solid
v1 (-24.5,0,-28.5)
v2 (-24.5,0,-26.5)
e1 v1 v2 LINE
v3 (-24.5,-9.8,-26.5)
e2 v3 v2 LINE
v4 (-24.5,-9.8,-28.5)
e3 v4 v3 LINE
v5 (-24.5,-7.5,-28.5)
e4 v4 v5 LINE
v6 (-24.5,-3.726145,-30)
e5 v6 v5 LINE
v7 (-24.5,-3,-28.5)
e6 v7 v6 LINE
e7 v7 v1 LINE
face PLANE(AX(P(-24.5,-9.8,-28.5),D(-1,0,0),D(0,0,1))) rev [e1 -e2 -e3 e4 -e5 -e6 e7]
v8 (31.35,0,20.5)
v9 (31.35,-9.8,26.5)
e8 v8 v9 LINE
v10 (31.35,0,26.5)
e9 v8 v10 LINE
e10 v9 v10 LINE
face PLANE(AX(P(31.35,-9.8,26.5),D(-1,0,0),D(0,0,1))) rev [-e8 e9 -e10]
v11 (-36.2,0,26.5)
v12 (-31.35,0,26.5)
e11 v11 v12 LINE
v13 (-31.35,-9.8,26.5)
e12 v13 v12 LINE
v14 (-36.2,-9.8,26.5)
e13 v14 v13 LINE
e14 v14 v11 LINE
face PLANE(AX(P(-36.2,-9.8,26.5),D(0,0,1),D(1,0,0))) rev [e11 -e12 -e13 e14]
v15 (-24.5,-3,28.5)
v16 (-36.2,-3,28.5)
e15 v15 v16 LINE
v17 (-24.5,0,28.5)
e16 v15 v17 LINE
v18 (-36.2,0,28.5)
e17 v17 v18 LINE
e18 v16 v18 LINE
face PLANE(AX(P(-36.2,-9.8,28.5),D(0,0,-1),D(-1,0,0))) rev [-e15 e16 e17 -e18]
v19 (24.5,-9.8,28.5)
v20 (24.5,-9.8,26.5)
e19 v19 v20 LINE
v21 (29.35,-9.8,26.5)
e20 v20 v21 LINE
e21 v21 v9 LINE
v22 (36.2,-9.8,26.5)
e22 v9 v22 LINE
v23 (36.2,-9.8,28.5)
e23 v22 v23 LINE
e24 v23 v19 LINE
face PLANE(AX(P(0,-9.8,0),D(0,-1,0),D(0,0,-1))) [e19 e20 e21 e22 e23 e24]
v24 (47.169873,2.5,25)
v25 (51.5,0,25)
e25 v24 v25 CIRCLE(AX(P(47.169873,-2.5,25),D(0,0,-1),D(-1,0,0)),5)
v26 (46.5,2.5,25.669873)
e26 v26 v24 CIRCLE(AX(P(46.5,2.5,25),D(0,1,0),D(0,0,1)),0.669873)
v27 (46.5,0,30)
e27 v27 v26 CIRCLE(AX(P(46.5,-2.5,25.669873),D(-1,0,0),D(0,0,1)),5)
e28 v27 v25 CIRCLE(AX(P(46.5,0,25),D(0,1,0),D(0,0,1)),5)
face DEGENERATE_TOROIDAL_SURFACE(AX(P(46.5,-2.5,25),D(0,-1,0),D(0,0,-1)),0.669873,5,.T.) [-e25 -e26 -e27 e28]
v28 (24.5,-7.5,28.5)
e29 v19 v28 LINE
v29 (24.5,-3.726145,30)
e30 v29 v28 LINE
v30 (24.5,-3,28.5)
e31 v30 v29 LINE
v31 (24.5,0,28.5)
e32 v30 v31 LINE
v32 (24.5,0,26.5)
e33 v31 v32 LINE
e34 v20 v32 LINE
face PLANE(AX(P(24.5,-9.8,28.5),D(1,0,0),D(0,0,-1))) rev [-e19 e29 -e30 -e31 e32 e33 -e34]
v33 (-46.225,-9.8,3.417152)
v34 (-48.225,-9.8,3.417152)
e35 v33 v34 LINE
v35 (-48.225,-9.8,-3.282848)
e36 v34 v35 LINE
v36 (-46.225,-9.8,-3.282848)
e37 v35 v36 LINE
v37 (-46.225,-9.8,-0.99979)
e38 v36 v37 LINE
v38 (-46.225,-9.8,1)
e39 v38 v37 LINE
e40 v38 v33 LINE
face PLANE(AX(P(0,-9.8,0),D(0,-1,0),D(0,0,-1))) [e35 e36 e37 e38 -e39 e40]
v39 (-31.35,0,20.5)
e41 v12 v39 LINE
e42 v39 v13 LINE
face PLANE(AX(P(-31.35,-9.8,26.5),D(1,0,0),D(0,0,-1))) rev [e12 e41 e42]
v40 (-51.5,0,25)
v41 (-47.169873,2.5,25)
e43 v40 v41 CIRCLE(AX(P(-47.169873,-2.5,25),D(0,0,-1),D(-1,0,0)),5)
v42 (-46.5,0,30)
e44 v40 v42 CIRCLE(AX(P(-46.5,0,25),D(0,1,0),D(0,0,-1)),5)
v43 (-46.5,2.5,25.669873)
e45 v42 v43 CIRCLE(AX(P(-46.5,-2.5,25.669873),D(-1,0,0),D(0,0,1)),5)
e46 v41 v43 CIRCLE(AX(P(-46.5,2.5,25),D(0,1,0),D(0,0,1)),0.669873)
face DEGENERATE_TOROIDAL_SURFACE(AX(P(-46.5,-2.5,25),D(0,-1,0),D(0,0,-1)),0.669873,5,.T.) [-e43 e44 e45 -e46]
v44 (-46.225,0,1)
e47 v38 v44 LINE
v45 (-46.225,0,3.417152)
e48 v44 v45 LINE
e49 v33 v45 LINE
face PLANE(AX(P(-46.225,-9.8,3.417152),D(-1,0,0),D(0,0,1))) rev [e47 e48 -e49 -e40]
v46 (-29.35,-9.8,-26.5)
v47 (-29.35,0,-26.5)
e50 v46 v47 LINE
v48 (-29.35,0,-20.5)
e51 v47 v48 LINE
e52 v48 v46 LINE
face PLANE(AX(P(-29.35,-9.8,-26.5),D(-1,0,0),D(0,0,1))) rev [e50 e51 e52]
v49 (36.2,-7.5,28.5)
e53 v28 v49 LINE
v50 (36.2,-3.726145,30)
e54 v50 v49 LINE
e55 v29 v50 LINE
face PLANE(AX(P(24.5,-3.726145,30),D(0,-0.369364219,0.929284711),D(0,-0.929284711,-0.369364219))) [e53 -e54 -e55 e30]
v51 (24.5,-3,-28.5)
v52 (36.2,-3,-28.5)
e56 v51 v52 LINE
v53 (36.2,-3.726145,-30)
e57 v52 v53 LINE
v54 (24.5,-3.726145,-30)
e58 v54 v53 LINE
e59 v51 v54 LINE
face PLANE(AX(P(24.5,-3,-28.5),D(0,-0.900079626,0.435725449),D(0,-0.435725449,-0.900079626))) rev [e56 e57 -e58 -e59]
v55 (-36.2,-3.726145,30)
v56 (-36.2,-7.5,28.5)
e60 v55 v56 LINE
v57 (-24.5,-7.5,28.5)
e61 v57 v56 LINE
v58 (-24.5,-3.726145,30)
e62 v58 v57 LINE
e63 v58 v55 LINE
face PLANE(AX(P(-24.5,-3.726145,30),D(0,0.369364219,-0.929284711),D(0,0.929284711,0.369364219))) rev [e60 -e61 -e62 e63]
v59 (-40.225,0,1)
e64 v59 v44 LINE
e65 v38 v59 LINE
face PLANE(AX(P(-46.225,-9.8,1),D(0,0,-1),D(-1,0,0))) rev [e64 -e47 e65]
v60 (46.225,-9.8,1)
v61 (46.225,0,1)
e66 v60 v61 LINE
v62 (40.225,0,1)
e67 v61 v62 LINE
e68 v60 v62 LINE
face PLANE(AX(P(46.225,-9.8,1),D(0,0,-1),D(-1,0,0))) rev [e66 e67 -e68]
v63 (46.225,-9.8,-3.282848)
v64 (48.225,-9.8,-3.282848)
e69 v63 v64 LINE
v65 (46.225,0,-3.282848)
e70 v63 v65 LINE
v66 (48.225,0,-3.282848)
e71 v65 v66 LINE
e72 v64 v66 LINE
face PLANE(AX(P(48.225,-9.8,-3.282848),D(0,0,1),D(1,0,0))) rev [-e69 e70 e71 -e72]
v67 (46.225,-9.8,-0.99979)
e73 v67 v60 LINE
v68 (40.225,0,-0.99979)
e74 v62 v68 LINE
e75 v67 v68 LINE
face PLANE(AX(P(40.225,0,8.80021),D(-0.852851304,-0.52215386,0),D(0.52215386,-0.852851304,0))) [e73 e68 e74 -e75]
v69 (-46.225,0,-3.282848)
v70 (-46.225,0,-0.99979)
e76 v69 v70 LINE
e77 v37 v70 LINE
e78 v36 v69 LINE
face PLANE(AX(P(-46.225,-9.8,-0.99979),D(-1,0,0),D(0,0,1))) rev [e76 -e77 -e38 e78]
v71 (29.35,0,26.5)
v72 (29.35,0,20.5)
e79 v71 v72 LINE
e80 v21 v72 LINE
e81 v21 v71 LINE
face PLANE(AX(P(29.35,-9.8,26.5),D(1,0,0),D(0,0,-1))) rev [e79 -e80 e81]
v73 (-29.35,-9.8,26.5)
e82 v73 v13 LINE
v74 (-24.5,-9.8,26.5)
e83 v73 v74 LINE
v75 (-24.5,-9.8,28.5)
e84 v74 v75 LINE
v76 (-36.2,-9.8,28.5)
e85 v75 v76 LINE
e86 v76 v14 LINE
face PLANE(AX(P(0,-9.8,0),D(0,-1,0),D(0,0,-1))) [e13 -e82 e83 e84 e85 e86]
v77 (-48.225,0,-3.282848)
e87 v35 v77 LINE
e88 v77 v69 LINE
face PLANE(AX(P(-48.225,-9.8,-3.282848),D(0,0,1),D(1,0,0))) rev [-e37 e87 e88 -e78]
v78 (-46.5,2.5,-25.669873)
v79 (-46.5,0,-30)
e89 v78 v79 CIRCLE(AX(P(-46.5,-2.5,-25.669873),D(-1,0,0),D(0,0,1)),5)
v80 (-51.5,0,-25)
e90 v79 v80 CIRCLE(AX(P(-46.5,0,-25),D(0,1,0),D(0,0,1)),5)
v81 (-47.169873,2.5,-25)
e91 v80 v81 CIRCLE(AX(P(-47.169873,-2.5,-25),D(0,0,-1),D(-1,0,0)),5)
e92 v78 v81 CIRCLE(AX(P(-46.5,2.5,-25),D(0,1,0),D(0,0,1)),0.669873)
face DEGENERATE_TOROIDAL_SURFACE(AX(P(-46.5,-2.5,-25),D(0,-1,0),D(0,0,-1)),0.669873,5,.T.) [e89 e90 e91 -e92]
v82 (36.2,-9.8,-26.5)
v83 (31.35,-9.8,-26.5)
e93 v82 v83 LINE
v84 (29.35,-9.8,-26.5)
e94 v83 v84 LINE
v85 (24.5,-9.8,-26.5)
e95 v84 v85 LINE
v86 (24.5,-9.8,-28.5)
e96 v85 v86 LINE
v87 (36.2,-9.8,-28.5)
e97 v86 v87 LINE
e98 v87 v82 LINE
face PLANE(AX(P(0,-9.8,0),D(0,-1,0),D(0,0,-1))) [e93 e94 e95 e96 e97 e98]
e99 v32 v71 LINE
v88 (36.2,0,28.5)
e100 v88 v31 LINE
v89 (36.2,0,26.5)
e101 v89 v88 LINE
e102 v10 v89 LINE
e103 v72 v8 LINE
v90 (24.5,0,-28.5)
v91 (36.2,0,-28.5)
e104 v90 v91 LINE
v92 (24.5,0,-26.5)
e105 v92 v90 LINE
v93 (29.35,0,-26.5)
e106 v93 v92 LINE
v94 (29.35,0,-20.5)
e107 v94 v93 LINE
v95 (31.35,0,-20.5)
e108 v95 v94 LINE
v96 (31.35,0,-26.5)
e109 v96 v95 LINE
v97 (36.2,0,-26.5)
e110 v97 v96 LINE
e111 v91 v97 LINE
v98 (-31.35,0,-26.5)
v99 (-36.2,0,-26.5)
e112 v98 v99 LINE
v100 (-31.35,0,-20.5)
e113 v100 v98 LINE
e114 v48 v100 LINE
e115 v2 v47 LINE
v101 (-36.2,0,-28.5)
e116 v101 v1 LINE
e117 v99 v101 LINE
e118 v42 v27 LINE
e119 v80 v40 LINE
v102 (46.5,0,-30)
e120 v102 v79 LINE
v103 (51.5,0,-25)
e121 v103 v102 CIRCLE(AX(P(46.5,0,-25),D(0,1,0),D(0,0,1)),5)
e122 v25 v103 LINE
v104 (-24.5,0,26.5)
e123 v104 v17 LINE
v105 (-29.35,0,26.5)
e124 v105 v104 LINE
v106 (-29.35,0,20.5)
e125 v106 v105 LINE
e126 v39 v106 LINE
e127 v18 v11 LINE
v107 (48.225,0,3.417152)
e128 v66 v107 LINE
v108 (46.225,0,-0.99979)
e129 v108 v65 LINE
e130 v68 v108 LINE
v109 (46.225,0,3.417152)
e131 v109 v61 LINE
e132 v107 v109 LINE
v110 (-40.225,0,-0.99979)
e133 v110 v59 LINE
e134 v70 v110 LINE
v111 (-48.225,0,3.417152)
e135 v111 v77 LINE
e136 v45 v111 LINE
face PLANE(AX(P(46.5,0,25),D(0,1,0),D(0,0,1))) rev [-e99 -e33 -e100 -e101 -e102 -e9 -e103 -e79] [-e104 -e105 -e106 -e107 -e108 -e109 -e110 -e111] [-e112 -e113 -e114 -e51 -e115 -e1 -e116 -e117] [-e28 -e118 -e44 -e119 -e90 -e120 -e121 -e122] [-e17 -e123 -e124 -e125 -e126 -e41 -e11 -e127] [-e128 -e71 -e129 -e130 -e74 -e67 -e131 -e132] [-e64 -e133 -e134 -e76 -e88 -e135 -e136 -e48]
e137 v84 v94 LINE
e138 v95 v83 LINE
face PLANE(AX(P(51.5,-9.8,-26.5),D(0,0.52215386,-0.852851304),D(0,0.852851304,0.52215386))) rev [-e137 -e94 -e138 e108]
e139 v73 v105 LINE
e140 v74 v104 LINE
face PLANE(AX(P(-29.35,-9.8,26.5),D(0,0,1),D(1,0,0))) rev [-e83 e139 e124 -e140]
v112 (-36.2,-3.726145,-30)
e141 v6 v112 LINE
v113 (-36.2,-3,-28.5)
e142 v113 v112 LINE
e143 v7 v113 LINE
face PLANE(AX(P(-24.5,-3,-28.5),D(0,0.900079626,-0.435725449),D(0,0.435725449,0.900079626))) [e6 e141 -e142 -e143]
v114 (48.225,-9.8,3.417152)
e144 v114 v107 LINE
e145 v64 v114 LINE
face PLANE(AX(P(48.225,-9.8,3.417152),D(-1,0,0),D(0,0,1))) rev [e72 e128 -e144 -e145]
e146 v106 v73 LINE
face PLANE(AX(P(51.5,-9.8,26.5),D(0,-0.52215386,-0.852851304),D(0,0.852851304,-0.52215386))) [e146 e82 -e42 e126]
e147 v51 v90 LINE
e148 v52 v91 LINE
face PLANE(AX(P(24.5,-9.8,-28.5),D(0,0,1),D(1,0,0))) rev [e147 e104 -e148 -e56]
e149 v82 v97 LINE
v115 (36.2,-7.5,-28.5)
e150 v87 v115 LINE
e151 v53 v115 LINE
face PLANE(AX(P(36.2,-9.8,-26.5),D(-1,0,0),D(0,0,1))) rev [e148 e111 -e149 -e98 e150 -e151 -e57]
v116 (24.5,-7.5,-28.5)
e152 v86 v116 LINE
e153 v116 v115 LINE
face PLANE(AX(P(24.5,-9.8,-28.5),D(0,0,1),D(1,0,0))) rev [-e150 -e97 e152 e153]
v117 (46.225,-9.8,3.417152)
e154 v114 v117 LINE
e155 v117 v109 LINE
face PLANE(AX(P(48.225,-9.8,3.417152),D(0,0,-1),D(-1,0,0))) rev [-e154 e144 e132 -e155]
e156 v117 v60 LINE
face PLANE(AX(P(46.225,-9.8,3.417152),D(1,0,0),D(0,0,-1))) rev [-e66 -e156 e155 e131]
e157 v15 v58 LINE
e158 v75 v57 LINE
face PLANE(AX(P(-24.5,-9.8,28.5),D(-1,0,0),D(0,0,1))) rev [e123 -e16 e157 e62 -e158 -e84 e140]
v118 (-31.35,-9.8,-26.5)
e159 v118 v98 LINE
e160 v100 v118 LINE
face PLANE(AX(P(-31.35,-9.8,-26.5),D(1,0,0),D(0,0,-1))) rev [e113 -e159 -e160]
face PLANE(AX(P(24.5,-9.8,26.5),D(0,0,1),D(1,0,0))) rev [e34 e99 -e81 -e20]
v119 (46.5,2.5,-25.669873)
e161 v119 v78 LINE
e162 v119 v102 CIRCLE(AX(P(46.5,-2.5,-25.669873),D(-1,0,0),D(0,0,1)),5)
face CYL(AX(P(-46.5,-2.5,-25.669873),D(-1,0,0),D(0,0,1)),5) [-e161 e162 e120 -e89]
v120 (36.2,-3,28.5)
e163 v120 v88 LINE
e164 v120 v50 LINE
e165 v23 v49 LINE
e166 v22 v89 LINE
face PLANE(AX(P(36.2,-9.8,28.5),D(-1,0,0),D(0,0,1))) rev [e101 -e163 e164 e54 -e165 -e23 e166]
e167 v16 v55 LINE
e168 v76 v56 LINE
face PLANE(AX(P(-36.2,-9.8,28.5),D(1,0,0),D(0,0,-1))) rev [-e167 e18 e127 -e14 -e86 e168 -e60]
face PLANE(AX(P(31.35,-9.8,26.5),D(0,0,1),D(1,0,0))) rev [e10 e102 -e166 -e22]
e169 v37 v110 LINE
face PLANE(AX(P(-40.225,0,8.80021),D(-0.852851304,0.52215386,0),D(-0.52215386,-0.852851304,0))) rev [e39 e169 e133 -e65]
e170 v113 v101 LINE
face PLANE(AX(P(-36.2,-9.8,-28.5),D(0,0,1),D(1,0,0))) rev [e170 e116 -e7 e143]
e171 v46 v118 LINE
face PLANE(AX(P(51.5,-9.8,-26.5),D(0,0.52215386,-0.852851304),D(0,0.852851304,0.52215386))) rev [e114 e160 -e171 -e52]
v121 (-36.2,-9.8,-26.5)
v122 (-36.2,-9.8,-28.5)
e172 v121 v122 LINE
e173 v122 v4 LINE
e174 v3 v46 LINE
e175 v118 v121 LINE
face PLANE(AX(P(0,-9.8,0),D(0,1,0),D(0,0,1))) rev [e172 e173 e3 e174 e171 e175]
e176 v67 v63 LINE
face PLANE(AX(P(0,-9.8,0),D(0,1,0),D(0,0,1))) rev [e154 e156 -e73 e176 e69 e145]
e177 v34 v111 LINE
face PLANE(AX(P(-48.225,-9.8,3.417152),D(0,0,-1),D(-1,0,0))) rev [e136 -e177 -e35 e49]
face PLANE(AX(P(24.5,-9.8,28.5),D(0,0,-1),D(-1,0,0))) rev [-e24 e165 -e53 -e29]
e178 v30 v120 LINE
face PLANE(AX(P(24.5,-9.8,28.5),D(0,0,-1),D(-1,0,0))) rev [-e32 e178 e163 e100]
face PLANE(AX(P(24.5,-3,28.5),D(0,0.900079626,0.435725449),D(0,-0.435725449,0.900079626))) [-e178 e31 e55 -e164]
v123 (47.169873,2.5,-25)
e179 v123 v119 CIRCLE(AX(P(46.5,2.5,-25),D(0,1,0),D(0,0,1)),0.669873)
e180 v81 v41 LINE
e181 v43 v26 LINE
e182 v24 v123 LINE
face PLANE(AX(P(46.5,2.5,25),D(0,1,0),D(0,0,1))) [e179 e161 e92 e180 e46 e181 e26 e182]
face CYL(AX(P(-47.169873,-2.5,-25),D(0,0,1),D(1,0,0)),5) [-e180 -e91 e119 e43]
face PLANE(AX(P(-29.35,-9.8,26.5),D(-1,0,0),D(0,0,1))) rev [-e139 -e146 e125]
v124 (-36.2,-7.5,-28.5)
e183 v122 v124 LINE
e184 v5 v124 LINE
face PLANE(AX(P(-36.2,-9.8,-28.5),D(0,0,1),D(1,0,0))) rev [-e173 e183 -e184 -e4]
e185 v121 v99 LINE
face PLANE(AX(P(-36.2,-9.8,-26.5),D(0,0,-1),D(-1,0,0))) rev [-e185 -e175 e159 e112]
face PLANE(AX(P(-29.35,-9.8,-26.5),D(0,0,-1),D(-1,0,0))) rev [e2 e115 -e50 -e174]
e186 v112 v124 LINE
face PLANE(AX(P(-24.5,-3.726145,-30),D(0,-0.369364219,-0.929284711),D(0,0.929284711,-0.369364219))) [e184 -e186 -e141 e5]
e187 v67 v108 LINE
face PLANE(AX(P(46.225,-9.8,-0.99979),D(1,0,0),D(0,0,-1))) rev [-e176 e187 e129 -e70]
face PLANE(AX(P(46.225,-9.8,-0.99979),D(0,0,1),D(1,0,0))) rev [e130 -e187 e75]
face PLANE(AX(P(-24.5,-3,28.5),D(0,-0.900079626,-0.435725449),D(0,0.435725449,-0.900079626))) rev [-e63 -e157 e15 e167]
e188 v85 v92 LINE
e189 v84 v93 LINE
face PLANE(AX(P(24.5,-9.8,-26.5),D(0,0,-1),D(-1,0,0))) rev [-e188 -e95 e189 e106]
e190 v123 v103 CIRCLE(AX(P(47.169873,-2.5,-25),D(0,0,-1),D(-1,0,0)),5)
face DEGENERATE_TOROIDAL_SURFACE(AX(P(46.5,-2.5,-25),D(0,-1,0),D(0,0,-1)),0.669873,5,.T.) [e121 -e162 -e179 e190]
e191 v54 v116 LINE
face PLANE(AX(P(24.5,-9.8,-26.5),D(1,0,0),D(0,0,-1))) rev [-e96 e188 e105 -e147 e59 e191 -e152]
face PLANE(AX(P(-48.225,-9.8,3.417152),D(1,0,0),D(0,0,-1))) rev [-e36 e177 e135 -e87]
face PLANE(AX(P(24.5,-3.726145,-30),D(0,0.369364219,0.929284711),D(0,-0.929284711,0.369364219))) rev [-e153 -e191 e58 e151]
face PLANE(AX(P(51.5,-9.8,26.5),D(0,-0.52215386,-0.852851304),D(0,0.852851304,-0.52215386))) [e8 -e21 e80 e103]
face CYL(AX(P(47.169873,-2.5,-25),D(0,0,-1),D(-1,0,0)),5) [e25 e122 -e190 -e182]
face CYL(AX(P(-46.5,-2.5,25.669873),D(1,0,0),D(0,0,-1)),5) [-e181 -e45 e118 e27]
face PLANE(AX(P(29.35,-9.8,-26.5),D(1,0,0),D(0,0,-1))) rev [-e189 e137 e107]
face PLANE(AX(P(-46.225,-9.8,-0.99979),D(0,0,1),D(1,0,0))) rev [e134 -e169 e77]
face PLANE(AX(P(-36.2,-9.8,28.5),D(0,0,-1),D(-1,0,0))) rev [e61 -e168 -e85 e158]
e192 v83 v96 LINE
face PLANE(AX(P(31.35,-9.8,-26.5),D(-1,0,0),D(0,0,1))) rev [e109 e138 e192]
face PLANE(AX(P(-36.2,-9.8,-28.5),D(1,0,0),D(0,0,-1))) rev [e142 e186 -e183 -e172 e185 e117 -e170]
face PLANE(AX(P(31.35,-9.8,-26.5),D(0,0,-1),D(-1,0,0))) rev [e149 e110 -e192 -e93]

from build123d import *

# Parameters (mm, degrees)
BOSS_EXTRUDE1_DEPTH  = 2.5
FILLET1_R            = 5
BOSS_EXTRUDE2_DEPTH  = 9.8
CUT_EXTRUDE1_DEPTH   = 9.8
CUT_EXTRUDE2_DEPTH   = 89.657557489
BOSS_EXTRUDE3_DEPTH  = 11.7
MIRROR4_COPY_1_DEPTH = 11.7


with BuildPart() as part:
    # Sketch1 → Boss-Extrude1 (new body)
    with BuildSketch(Plane(origin=(0, 0, 0), x_dir=(1, 0, 0), z_dir=(0, 1, 0))):
        with BuildLine():
            Line((-46.5, 30), (46.5, 30))
            ThreePointArc((46.5, 30), (50.035533906, 28.535533906), (51.5, 25))
            Line((51.5, 25), (51.5, -25))
            ThreePointArc((51.5, -25), (50.035533906, -28.535533906), (46.5, -30))
            Line((46.5, -30), (-46.5, -30))
            ThreePointArc((-46.5, -30), (-50.035533906, -28.535533906), (-51.5, -25))
            Line((-51.5, -25), (-51.5, 25))
            ThreePointArc((-51.5, 25), (-50.035533906, 28.535533906), (-46.5, 30))
        make_face()
    extrude(amount=BOSS_EXTRUDE1_DEPTH)

    # Fillet1
    # the kernel refuses this fillet: 5 mm, written as the material it takes off along each edge
    with BuildSketch(Plane(origin=(-46.5, 2.5, -25), x_dir=(-1, 0, 0), z_dir=(0, 0, 1))) as fillet1_piece_1:
        with BuildLine():
            CenterArc((0.669872981, 5), FILLET1_R, 270, 60)
            Line((0.669872981, 0), (0.669872981, -0.1))
            Line((0.669872981, -0.1), (5, -0.1))
            Line((5, -0.1), (5.1, 0))
            ThreePointArc((5.1, 0), (5.1, 1.25), (5.08660254, 2.45))
            Line((5.08660254, 2.45), (5, 2.5))
        make_face()
    revolve(axis=Axis((-46.5, 2.5, -25), (0, -1, 0)), revolution_arc=90, mode=Mode.SUBTRACT)
    with BuildSketch(Plane(origin=(-46.5, 2.5, -30), x_dir=(0, -1, 0), z_dir=(1, 0, 0)), Plane(origin=(46.5, 2.5, 30), x_dir=(0, -1, 0), z_dir=(-1, 0, 0))) as fillet1_piece_2:
        with BuildLine():
            CenterArc((5, -4.330127019), FILLET1_R, 120, 60)
            Line((0, -4.330127019), (-0.1, -4.330127019))
            Line((-0.1, -4.330127019), (-0.1, 0))
            Line((-0.1, 0), (0, 0.1))
            ThreePointArc((0, 0.1), (1.25, 0.1), (2.45, 0.08660254))
            Line((2.45, 0.08660254), (2.5, 0))
        make_face()
    extrude(amount=93, mode=Mode.SUBTRACT)
    with BuildSketch(Plane(origin=(46.5, 2.5, -25), x_dir=(0, 0, -1), z_dir=(-1, 0, 0))) as fillet1_piece_3:
        with BuildLine():
            CenterArc((0.669872981, 5), FILLET1_R, 270, 60)
            Line((0.669872981, 0), (0.669872981, -0.1))
            Line((0.669872981, -0.1), (5, -0.1))
            Line((5, -0.1), (5.1, 0))
            ThreePointArc((5.1, 0), (5.1, 1.25), (5.08660254, 2.45))
            Line((5.08660254, 2.45), (5, 2.5))
        make_face()
    revolve(axis=Axis((46.5, 2.5, -25), (0, -1, 0)), revolution_arc=90, mode=Mode.SUBTRACT)
    with BuildSketch(Plane(origin=(51.5, 2.5, -25), x_dir=(0, -1, 0), z_dir=(0, 0, 1)), Plane(origin=(-51.5, 2.5, 25), x_dir=(0, -1, 0), z_dir=(0, 0, -1))) as fillet1_piece_4:
        with BuildLine():
            CenterArc((5, -4.330127019), FILLET1_R, 120, 60)
            Line((0, -4.330127019), (-0.1, -4.330127019))
            Line((-0.1, -4.330127019), (-0.1, 0))
            Line((-0.1, 0), (0, 0.1))
            ThreePointArc((0, 0.1), (1.25, 0.1), (2.45, 0.08660254))
            Line((2.45, 0.08660254), (2.5, 0))
        make_face()
    extrude(amount=50, mode=Mode.SUBTRACT)
    with BuildSketch(Plane(origin=(46.5, 2.5, 25), x_dir=(1, 0, 0), z_dir=(0, 0, -1))) as fillet1_piece_5:
        with BuildLine():
            CenterArc((0.669872981, 5), FILLET1_R, 270, 60)
            Line((0.669872981, 0), (0.669872981, -0.1))
            Line((0.669872981, -0.1), (5, -0.1))
            Line((5, -0.1), (5.1, 0))
            ThreePointArc((5.1, 0), (5.1, 1.25), (5.08660254, 2.45))
            Line((5.08660254, 2.45), (5, 2.5))
        make_face()
    revolve(axis=Axis((46.5, 2.5, 25), (0, -1, 0)), revolution_arc=90, mode=Mode.SUBTRACT)
    with BuildSketch(Plane(origin=(-46.5, 2.5, 25), x_dir=(0, 0, 1), z_dir=(1, 0, 0))) as fillet1_piece_6:
        with BuildLine():
            CenterArc((0.669872981, 5), FILLET1_R, 270, 60)
            Line((0.669872981, 0), (0.669872981, -0.1))
            Line((0.669872981, -0.1), (5, -0.1))
            Line((5, -0.1), (5.1, 0))
            ThreePointArc((5.1, 0), (5.1, 1.25), (5.08660254, 2.45))
            Line((5.08660254, 2.45), (5, 2.5))
        make_face()
    revolve(axis=Axis((-46.5, 2.5, 25), (0, -1, 0)), revolution_arc=90, mode=Mode.SUBTRACT)

    # Sketch2 → Boss-Extrude2 (add)
    with BuildSketch(Plane.XZ):
        Polygon((-36.2, 28.5), (-24.5, 28.5), (-24.5, 26.5), (-29.35, 26.5), (-29.35, 20.5), (-31.35, 20.5), (-31.35, 26.5), (-36.2, 26.5), align=None)
        Polygon((48.225, -3.282847821), (46.225, -3.282847821), (46.225, -0.999790058), (40.225, -0.999790058), (40.225, 1), (46.225, 1), (46.225, 3.417152179), (48.225, 3.417152179), align=None)
        Polygon((24.5, 28.5), (36.2, 28.5), (36.2, 26.5), (31.35, 26.5), (31.35, 20.5), (29.35, 20.5), (29.35, 26.5), (24.5, 26.5), align=None)
        Polygon((24.5, -26.5), (29.35, -26.5), (29.35, -20.5), (31.35, -20.5), (31.35, -26.5), (36.2, -26.5), (36.2, -28.5), (24.5, -28.5), align=None)
        Polygon((-36.2, -28.5), (-24.5, -28.5), (-24.5, -26.5), (-29.35, -26.5), (-29.35, -20.5), (-31.35, -20.5), (-31.35, -26.5), (-36.2, -26.5), align=None)
        Polygon((-48.225, 3.417152179), (-46.225, 3.417152179), (-46.225, 1), (-40.225, 1), (-40.225, -0.999790058), (-46.225, -0.999790058), (-46.225, -3.282847821), (-48.225, -3.282847821), align=None)
    extrude(amount=BOSS_EXTRUDE2_DEPTH)

    # Sketch4 → Cut-Extrude1 (cut)
    with BuildSketch(Plane(origin=(0, 0, -0.999790058), x_dir=(-1, 0, 0), z_dir=(0, 0, -1))):
        Polygon((40.225, 0), (46.225, -9.8), (40.225, -9.8), align=None)
    cut_extrude1 = extrude(amount=-CUT_EXTRUDE1_DEPTH, mode=Mode.SUBTRACT)

    # Mirror1: Cut-Extrude1 across plane
    add(cut_extrude1.mirror(Plane(origin=(0, 0, 0), x_dir=(0, 0, 1), z_dir=(1, 0, 0))), mode=Mode.SUBTRACT)

    # Sketch5 → Cut-Extrude2 (cut, through all)
    with BuildSketch(Plane.ZY.offset(31.35)):
        Polygon((-26.5, -9.8), (-20.5, 0), (-20.5, -9.8), align=None)
    cut_extrude2 = extrude(amount=-CUT_EXTRUDE2_DEPTH, mode=Mode.SUBTRACT)

    # Mirror2: Cut-Extrude2 across plane
    add(cut_extrude2.mirror(Plane.XY), mode=Mode.SUBTRACT)

    # Sketch6 → Boss-Extrude3 (add)
    with BuildSketch(Plane(origin=(36.2, 0, 0), x_dir=(0, 0, -1), z_dir=(1, 0, 0))):
        Polygon((-28.5, -3), (-28.5, -7.5), (-30, -3.726144837), align=None)
    boss_extrude3 = extrude(amount=-BOSS_EXTRUDE3_DEPTH)

    # Mirror3: Boss-Extrude3 across plane
    add(boss_extrude3.mirror(Plane(origin=(0, 0, 0), x_dir=(0, 0, 1), z_dir=(1, 0, 0))))

    # Mirror4: Boss-Extrude3 across plane
    add(boss_extrude3.mirror(Plane.XY))

    # Mirror4 copy 1 sketch → Mirror4 copy 1 (add)
    with BuildSketch(Plane.ZY.offset(36.2)):
        Polygon((-28.5, -3), (-28.5, -7.5), (-30, -3.726144837), align=None)
    extrude(amount=-MIRROR4_COPY_1_DEPTH)


solid = part.part
